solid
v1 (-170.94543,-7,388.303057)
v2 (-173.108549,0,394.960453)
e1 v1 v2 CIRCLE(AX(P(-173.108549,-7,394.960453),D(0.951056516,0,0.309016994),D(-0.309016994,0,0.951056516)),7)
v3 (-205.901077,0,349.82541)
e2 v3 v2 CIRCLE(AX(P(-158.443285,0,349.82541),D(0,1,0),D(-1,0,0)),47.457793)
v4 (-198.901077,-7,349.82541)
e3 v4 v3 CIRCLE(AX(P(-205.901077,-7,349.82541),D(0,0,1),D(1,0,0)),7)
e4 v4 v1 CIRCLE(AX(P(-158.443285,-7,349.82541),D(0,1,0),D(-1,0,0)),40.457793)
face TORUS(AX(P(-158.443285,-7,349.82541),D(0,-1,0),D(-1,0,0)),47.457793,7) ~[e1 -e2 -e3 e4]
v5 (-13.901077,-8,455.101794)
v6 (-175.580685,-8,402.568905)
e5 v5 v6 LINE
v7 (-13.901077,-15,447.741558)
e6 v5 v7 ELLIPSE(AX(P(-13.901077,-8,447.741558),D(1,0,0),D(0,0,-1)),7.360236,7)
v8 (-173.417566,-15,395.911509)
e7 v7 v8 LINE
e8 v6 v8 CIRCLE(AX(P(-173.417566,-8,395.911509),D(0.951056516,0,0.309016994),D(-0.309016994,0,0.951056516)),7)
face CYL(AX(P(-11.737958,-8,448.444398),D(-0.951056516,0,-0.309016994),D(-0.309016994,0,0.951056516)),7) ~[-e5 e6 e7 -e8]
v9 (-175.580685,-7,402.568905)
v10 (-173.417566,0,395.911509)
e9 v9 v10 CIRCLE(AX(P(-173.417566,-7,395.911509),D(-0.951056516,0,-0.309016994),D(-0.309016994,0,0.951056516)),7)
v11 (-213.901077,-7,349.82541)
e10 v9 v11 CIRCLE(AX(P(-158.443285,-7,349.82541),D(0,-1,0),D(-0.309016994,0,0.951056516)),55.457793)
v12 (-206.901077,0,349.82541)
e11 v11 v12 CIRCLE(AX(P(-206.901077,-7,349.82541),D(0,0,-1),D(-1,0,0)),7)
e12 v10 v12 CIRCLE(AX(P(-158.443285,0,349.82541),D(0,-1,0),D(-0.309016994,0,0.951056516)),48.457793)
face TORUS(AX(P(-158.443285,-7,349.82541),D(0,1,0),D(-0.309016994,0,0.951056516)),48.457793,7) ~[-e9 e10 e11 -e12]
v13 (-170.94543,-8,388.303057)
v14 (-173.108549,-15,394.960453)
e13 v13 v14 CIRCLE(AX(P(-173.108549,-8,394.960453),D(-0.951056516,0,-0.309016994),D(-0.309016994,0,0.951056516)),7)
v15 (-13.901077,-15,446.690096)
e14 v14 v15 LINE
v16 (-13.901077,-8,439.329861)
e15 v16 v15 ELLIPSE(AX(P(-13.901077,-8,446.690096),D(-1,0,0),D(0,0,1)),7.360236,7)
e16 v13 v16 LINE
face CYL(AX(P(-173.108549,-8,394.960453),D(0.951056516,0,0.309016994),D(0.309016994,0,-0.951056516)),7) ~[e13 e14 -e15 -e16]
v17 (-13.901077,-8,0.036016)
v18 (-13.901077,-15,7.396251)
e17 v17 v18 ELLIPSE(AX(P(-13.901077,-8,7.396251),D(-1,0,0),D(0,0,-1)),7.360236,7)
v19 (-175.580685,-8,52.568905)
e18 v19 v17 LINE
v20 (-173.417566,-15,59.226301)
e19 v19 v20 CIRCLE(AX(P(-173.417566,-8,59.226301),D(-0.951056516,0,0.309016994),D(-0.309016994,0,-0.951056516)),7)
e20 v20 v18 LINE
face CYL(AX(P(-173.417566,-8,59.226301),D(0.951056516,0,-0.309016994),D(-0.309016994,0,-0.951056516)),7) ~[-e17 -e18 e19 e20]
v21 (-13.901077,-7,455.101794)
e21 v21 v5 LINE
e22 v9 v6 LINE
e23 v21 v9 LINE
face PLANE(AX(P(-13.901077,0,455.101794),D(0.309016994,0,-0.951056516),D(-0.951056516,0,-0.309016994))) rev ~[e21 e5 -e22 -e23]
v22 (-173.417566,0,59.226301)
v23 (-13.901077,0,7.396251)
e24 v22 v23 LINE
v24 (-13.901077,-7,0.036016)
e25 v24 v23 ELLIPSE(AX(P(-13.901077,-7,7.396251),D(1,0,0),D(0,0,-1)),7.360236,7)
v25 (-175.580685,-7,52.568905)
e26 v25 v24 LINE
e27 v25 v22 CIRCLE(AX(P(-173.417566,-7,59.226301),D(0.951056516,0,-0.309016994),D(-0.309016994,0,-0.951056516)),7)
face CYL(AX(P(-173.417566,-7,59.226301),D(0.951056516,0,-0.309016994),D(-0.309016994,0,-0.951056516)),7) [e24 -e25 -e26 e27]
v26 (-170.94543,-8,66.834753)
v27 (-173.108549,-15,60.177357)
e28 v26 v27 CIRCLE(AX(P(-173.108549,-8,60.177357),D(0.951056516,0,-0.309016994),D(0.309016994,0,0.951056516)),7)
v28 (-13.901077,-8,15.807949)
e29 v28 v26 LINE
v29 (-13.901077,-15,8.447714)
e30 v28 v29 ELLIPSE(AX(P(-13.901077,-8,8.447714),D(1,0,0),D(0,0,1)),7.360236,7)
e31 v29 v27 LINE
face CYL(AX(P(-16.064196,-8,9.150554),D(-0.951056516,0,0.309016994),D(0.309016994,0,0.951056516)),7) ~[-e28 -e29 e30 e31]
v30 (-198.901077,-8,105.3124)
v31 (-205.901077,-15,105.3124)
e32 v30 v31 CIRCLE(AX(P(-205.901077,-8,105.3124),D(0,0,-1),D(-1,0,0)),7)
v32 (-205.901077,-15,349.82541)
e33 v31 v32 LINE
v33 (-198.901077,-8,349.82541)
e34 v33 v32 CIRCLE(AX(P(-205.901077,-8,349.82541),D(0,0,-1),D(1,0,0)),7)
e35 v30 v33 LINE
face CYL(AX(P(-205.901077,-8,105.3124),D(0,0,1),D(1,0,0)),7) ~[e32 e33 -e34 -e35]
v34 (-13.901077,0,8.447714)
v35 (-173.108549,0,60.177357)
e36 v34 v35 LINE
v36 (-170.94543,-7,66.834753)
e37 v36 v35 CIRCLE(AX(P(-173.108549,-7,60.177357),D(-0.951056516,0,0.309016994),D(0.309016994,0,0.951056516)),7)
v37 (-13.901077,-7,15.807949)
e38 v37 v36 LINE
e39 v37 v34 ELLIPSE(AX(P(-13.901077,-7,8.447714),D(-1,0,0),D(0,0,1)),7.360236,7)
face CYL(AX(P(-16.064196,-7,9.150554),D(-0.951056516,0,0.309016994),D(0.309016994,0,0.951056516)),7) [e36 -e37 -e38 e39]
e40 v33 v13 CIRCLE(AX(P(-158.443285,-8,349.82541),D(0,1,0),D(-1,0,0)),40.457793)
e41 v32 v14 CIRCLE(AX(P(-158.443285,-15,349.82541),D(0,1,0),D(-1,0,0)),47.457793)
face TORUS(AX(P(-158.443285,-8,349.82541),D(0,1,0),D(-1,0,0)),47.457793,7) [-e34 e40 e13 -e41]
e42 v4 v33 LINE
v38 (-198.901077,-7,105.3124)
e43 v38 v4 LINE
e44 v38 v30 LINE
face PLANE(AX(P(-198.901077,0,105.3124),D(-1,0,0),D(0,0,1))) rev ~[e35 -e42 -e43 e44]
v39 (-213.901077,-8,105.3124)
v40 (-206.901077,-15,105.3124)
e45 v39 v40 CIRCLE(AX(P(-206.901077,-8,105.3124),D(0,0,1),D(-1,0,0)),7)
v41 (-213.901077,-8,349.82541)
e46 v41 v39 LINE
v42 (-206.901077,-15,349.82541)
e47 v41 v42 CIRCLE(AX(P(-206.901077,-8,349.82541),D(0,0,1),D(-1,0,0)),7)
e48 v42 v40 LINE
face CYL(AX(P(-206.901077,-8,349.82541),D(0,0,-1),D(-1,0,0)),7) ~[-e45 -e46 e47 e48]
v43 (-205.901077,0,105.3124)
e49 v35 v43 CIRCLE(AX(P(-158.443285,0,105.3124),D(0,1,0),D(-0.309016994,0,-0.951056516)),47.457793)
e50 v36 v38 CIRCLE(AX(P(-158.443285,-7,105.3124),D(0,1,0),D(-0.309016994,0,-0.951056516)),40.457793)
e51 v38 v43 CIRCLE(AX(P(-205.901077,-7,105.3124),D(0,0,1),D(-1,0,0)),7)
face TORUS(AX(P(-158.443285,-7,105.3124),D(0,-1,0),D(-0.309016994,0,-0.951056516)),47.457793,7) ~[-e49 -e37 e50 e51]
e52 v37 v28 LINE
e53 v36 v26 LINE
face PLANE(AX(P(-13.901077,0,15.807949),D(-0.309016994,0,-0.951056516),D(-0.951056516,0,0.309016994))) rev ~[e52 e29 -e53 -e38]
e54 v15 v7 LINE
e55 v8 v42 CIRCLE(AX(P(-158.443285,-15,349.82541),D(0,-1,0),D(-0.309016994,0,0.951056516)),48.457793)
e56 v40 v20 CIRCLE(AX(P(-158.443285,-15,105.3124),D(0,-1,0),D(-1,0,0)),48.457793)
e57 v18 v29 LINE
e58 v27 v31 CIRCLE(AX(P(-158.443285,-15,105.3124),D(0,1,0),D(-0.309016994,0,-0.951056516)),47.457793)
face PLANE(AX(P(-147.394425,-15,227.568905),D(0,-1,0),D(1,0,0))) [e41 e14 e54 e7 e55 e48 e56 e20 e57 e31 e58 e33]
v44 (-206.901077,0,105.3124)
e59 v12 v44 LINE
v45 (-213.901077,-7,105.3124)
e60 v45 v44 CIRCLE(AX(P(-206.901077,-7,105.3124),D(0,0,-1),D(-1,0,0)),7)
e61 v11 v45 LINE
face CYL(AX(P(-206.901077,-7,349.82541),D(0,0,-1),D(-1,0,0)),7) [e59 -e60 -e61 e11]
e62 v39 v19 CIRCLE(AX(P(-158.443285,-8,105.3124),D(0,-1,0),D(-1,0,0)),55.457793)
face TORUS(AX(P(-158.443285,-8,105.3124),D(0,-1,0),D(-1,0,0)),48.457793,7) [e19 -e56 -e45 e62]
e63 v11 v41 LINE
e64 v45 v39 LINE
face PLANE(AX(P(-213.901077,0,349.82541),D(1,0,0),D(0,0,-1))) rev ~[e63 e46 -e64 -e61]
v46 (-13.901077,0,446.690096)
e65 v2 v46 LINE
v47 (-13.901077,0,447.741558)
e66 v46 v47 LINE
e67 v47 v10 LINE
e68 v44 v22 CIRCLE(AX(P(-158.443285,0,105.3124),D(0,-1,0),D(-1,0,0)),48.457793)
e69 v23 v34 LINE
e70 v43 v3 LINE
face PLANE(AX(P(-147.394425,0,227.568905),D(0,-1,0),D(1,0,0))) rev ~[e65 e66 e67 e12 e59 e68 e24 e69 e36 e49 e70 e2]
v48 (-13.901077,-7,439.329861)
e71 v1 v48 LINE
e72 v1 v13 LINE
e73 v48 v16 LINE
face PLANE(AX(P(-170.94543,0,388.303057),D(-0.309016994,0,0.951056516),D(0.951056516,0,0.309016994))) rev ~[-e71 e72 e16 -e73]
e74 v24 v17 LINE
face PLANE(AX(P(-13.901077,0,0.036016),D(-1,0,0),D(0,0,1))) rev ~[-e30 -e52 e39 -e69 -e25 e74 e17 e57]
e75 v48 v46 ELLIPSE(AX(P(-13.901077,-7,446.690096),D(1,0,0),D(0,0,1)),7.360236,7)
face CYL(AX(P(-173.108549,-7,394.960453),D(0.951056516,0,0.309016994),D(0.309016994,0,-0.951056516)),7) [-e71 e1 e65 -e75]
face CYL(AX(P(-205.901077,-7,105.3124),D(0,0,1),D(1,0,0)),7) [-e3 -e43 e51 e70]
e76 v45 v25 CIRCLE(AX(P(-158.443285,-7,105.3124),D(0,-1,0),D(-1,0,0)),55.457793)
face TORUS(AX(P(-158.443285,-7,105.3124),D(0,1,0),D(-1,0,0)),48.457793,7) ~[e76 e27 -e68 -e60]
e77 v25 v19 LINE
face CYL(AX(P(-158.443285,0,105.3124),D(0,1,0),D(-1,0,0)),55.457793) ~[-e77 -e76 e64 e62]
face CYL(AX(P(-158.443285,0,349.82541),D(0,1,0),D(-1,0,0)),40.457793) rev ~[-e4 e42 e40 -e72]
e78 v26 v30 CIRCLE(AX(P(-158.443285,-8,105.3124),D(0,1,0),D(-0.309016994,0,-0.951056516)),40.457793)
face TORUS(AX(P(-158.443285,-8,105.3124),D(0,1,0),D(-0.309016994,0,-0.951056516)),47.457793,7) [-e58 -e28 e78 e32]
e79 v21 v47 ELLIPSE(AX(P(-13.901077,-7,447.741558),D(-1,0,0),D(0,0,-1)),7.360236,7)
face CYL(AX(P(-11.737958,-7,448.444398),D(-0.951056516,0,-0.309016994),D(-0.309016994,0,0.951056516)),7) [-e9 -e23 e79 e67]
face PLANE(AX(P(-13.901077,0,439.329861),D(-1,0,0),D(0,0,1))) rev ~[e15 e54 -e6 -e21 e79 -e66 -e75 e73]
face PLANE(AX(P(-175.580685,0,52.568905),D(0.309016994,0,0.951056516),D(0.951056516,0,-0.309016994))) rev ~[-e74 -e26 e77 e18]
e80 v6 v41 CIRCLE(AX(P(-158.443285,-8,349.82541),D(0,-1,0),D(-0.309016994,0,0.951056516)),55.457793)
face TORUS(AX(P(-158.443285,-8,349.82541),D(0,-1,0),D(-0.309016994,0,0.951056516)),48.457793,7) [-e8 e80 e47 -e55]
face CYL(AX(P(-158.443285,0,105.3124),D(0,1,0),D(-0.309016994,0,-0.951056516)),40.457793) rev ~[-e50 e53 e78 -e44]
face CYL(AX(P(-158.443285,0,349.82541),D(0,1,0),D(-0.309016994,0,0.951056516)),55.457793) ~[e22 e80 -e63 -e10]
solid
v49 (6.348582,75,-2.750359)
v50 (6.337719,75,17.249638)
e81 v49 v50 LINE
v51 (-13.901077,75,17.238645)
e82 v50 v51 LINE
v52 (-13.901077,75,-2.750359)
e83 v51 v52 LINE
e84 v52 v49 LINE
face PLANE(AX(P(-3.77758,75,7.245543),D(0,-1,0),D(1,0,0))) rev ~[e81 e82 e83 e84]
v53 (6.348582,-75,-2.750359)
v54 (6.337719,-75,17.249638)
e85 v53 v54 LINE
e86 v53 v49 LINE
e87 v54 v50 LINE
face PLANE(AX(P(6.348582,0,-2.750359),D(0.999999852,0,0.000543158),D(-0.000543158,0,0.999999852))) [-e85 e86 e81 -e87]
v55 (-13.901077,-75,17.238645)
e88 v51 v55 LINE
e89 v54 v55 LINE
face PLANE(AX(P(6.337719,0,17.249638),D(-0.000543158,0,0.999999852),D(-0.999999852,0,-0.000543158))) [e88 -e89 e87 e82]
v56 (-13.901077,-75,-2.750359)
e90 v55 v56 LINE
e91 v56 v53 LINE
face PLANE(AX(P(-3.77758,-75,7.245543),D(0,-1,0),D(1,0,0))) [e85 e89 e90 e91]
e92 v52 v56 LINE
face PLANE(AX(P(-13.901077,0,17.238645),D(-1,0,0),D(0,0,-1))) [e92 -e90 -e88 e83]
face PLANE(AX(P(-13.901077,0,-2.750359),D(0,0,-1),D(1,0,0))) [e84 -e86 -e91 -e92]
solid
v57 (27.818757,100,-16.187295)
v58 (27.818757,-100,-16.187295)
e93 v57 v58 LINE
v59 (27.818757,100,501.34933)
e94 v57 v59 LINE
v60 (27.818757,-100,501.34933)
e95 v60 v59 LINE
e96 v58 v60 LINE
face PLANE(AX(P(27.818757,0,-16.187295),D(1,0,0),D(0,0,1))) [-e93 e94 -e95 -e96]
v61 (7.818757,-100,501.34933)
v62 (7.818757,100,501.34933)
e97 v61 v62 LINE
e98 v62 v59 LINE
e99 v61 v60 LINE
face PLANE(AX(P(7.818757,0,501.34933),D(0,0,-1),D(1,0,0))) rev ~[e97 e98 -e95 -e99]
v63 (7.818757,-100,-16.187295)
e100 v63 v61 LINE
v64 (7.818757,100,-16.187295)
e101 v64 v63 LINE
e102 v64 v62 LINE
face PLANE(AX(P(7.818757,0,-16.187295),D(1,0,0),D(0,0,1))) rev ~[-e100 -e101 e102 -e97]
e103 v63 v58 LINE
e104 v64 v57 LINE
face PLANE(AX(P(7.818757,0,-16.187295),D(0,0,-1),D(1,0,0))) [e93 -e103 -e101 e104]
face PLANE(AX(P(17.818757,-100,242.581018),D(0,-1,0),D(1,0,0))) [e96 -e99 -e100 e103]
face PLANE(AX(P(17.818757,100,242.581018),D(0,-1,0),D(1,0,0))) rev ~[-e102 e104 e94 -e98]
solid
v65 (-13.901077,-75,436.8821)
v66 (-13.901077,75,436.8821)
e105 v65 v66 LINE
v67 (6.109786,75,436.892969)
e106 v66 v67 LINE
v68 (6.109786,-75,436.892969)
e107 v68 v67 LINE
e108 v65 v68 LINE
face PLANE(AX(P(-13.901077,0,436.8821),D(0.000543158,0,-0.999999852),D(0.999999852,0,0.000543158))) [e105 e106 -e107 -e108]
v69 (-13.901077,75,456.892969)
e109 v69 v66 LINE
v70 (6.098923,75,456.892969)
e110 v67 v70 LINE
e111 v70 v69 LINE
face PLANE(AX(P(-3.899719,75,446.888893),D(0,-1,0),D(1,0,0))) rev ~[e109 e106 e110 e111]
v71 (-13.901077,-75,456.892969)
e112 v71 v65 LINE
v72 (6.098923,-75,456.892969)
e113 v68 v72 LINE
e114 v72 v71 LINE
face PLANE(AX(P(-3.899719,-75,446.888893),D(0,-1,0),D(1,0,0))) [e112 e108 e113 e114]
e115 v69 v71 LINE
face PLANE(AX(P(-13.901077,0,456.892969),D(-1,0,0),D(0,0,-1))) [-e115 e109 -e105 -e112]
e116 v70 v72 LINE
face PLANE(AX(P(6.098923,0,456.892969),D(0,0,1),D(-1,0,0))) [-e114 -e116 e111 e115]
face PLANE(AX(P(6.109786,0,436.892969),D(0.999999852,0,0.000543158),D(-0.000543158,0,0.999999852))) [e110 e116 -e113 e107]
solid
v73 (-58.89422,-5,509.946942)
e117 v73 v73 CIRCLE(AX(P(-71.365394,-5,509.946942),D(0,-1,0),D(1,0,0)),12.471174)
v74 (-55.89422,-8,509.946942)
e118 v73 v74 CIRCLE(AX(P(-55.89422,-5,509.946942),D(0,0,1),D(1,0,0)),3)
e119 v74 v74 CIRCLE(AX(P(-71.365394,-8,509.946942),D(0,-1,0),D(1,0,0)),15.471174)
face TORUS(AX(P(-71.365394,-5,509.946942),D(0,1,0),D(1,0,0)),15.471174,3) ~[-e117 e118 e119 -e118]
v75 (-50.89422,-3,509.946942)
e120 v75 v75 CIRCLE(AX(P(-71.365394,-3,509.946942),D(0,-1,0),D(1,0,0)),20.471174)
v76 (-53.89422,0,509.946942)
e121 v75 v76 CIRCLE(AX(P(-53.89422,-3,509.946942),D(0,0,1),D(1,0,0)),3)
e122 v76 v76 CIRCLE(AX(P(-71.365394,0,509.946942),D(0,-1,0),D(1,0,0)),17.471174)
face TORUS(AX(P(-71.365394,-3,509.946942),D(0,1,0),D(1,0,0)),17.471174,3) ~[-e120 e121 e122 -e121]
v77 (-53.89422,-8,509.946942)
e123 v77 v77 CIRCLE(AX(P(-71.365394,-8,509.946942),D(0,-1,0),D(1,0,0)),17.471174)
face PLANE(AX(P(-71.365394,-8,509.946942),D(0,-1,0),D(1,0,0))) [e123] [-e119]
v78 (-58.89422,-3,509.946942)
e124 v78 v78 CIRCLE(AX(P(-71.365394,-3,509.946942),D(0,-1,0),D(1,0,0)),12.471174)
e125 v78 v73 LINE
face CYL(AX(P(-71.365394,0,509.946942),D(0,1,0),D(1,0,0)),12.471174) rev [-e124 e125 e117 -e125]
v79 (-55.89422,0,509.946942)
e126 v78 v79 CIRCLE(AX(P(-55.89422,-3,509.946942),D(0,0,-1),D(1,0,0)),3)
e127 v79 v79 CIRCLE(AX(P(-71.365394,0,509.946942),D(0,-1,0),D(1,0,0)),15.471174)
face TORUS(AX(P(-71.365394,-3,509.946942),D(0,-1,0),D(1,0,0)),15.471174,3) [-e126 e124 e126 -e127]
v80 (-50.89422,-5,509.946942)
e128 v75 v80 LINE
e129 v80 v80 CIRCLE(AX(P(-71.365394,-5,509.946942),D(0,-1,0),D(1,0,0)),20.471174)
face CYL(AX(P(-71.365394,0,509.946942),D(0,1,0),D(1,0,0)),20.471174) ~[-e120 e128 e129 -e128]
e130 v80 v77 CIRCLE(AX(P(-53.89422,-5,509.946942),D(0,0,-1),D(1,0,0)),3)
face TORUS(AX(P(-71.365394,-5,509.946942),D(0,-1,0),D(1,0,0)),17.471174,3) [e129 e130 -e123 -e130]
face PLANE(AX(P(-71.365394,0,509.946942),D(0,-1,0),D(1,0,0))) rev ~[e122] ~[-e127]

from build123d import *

# Parameters (mm, degrees)
F1_DEPTH = 75
F2_DEPTH = 15
F3_R     = 7
F4_R     = 20.4711735864
F4_R_2   = 12.4711735864
F5_DEPTH = 8
F6_R     = 3
F4_W     = 20
F4_H     = 517.5366248004
F7_DEPTH = 100


# Not quite as in the source:
# - a feature names something its author has since deleted; it is built from what else it names


with BuildPart() as f1:
    # F0 (on Front) → F1 (new body, symmetric)
    with BuildSketch(Plane.XZ):
        Polygon((6.3377187523, 17.2496383322), (-13.9010772109, 17.2386454604), (-13.9010772109, 15.8079492705), (-13.9010772109, 0.0360159069), (-13.9010772109, -2.7503587176), (6.3485819185, -2.7503587176), align=None)
    extrude(amount=F1_DEPTH, both=True)


with BuildPart() as f1b:
    # F0 (on Front) → F1, piece 2 (new body, symmetric)
    with BuildSketch(Plane.XZ):
        Polygon((6.1097859569, 436.8929690868), (6.0989227891, 456.8929690868), (-13.9010772109, 456.8929690868), (-13.9010772109, 455.1017939944), (-13.9010772109, 439.3298606308), (-13.9010772109, 436.8821000186), align=None)
    extrude(amount=F1_DEPTH, both=True)


with BuildPart() as f2:
    # F0 (on Front) → F2 (new body)
    with BuildSketch(Plane.XZ):
        with BuildLine():
            Line((-13.9010772109, 439.3298606308), (-13.9010772109, 455.1017939944))
            Line((-13.9010772109, 455.1017939944), (-175.5806849811, 402.5689049507))
            ThreePointArc((-175.5806849811, 402.5689049507), (-203.309581291, 382.4226825268), (-213.9010772109, 349.8254099002))
            Line((-213.9010772109, 349.8254099002), (-213.9010772109, 105.3124000012))
            ThreePointArc((-213.9010772109, 105.3124000012), (-203.309581291, 72.7151273745), (-175.5806849811, 52.5689049507))
            Line((-175.5806849811, 52.5689049507), (-13.9010772109, 0.0360159069))
            Line((-13.9010772109, 0.0360159069), (-13.9010772109, 15.8079492705))
            Line((-13.9010772109, 15.8079492705), (-170.9454300655, 66.8347526951))
            ThreePointArc((-170.9454300655, 66.8347526951), (-191.1743263754, 81.5319061589), (-198.9010772109, 105.3124000012))
            Line((-198.9010772109, 105.3124000012), (-198.9010772109, 349.8254099002))
            ThreePointArc((-198.9010772109, 349.8254099002), (-191.1743263754, 373.6059037424), (-170.9454300655, 388.3030572062))
            Line((-170.9454300655, 388.3030572062), (-13.9010772109, 439.3298606308))
        make_face()
    extrude(amount=F2_DEPTH)

    # F3
    f3_edges = [f2.edges().sort_by_distance(p)[0] for p in [
        (-94.740881, -15, 428.835349),
        (-94.740881, 0, 428.835349),
        (-92.423254, -15, 413.816459),
        (-92.423254, 0, 413.816459),
    ]]
    fillet(f3_edges, radius=F3_R)


with BuildPart() as f5:
    # F4 (on Front) → F5 (new body)
    with BuildSketch(Plane.XZ):
        with Locations((-71.3653936982, 509.9469423294)):
            Circle(F4_R)
        with Locations((-71.3653936982, 509.9469423294)):
            Circle(F4_R_2, mode=Mode.SUBTRACT)
    extrude(amount=F5_DEPTH)

    # F6
    f6_edges = [f5.edges().sort_by_distance(p)[0] for p in [
        (-91.836567, -8, 509.946942),
        (-91.836567, 0, 509.946942),
        (-83.836567, 0, 509.946942),
        (-83.836567, -8, 509.946942),
    ]]
    fillet(f6_edges, radius=F6_R)


with BuildPart() as f7:
    # F4 (on Front) → F7 (new body, symmetric)
    with BuildSketch(Plane.XZ):
        with Locations((17.8187572956, 242.5810175482)):
            Rectangle(F4_W, F4_H)
    extrude(amount=F7_DEPTH, both=True)


solid = Compound([f1.part, f1b.part, f2.part, f5.part, f7.part])
